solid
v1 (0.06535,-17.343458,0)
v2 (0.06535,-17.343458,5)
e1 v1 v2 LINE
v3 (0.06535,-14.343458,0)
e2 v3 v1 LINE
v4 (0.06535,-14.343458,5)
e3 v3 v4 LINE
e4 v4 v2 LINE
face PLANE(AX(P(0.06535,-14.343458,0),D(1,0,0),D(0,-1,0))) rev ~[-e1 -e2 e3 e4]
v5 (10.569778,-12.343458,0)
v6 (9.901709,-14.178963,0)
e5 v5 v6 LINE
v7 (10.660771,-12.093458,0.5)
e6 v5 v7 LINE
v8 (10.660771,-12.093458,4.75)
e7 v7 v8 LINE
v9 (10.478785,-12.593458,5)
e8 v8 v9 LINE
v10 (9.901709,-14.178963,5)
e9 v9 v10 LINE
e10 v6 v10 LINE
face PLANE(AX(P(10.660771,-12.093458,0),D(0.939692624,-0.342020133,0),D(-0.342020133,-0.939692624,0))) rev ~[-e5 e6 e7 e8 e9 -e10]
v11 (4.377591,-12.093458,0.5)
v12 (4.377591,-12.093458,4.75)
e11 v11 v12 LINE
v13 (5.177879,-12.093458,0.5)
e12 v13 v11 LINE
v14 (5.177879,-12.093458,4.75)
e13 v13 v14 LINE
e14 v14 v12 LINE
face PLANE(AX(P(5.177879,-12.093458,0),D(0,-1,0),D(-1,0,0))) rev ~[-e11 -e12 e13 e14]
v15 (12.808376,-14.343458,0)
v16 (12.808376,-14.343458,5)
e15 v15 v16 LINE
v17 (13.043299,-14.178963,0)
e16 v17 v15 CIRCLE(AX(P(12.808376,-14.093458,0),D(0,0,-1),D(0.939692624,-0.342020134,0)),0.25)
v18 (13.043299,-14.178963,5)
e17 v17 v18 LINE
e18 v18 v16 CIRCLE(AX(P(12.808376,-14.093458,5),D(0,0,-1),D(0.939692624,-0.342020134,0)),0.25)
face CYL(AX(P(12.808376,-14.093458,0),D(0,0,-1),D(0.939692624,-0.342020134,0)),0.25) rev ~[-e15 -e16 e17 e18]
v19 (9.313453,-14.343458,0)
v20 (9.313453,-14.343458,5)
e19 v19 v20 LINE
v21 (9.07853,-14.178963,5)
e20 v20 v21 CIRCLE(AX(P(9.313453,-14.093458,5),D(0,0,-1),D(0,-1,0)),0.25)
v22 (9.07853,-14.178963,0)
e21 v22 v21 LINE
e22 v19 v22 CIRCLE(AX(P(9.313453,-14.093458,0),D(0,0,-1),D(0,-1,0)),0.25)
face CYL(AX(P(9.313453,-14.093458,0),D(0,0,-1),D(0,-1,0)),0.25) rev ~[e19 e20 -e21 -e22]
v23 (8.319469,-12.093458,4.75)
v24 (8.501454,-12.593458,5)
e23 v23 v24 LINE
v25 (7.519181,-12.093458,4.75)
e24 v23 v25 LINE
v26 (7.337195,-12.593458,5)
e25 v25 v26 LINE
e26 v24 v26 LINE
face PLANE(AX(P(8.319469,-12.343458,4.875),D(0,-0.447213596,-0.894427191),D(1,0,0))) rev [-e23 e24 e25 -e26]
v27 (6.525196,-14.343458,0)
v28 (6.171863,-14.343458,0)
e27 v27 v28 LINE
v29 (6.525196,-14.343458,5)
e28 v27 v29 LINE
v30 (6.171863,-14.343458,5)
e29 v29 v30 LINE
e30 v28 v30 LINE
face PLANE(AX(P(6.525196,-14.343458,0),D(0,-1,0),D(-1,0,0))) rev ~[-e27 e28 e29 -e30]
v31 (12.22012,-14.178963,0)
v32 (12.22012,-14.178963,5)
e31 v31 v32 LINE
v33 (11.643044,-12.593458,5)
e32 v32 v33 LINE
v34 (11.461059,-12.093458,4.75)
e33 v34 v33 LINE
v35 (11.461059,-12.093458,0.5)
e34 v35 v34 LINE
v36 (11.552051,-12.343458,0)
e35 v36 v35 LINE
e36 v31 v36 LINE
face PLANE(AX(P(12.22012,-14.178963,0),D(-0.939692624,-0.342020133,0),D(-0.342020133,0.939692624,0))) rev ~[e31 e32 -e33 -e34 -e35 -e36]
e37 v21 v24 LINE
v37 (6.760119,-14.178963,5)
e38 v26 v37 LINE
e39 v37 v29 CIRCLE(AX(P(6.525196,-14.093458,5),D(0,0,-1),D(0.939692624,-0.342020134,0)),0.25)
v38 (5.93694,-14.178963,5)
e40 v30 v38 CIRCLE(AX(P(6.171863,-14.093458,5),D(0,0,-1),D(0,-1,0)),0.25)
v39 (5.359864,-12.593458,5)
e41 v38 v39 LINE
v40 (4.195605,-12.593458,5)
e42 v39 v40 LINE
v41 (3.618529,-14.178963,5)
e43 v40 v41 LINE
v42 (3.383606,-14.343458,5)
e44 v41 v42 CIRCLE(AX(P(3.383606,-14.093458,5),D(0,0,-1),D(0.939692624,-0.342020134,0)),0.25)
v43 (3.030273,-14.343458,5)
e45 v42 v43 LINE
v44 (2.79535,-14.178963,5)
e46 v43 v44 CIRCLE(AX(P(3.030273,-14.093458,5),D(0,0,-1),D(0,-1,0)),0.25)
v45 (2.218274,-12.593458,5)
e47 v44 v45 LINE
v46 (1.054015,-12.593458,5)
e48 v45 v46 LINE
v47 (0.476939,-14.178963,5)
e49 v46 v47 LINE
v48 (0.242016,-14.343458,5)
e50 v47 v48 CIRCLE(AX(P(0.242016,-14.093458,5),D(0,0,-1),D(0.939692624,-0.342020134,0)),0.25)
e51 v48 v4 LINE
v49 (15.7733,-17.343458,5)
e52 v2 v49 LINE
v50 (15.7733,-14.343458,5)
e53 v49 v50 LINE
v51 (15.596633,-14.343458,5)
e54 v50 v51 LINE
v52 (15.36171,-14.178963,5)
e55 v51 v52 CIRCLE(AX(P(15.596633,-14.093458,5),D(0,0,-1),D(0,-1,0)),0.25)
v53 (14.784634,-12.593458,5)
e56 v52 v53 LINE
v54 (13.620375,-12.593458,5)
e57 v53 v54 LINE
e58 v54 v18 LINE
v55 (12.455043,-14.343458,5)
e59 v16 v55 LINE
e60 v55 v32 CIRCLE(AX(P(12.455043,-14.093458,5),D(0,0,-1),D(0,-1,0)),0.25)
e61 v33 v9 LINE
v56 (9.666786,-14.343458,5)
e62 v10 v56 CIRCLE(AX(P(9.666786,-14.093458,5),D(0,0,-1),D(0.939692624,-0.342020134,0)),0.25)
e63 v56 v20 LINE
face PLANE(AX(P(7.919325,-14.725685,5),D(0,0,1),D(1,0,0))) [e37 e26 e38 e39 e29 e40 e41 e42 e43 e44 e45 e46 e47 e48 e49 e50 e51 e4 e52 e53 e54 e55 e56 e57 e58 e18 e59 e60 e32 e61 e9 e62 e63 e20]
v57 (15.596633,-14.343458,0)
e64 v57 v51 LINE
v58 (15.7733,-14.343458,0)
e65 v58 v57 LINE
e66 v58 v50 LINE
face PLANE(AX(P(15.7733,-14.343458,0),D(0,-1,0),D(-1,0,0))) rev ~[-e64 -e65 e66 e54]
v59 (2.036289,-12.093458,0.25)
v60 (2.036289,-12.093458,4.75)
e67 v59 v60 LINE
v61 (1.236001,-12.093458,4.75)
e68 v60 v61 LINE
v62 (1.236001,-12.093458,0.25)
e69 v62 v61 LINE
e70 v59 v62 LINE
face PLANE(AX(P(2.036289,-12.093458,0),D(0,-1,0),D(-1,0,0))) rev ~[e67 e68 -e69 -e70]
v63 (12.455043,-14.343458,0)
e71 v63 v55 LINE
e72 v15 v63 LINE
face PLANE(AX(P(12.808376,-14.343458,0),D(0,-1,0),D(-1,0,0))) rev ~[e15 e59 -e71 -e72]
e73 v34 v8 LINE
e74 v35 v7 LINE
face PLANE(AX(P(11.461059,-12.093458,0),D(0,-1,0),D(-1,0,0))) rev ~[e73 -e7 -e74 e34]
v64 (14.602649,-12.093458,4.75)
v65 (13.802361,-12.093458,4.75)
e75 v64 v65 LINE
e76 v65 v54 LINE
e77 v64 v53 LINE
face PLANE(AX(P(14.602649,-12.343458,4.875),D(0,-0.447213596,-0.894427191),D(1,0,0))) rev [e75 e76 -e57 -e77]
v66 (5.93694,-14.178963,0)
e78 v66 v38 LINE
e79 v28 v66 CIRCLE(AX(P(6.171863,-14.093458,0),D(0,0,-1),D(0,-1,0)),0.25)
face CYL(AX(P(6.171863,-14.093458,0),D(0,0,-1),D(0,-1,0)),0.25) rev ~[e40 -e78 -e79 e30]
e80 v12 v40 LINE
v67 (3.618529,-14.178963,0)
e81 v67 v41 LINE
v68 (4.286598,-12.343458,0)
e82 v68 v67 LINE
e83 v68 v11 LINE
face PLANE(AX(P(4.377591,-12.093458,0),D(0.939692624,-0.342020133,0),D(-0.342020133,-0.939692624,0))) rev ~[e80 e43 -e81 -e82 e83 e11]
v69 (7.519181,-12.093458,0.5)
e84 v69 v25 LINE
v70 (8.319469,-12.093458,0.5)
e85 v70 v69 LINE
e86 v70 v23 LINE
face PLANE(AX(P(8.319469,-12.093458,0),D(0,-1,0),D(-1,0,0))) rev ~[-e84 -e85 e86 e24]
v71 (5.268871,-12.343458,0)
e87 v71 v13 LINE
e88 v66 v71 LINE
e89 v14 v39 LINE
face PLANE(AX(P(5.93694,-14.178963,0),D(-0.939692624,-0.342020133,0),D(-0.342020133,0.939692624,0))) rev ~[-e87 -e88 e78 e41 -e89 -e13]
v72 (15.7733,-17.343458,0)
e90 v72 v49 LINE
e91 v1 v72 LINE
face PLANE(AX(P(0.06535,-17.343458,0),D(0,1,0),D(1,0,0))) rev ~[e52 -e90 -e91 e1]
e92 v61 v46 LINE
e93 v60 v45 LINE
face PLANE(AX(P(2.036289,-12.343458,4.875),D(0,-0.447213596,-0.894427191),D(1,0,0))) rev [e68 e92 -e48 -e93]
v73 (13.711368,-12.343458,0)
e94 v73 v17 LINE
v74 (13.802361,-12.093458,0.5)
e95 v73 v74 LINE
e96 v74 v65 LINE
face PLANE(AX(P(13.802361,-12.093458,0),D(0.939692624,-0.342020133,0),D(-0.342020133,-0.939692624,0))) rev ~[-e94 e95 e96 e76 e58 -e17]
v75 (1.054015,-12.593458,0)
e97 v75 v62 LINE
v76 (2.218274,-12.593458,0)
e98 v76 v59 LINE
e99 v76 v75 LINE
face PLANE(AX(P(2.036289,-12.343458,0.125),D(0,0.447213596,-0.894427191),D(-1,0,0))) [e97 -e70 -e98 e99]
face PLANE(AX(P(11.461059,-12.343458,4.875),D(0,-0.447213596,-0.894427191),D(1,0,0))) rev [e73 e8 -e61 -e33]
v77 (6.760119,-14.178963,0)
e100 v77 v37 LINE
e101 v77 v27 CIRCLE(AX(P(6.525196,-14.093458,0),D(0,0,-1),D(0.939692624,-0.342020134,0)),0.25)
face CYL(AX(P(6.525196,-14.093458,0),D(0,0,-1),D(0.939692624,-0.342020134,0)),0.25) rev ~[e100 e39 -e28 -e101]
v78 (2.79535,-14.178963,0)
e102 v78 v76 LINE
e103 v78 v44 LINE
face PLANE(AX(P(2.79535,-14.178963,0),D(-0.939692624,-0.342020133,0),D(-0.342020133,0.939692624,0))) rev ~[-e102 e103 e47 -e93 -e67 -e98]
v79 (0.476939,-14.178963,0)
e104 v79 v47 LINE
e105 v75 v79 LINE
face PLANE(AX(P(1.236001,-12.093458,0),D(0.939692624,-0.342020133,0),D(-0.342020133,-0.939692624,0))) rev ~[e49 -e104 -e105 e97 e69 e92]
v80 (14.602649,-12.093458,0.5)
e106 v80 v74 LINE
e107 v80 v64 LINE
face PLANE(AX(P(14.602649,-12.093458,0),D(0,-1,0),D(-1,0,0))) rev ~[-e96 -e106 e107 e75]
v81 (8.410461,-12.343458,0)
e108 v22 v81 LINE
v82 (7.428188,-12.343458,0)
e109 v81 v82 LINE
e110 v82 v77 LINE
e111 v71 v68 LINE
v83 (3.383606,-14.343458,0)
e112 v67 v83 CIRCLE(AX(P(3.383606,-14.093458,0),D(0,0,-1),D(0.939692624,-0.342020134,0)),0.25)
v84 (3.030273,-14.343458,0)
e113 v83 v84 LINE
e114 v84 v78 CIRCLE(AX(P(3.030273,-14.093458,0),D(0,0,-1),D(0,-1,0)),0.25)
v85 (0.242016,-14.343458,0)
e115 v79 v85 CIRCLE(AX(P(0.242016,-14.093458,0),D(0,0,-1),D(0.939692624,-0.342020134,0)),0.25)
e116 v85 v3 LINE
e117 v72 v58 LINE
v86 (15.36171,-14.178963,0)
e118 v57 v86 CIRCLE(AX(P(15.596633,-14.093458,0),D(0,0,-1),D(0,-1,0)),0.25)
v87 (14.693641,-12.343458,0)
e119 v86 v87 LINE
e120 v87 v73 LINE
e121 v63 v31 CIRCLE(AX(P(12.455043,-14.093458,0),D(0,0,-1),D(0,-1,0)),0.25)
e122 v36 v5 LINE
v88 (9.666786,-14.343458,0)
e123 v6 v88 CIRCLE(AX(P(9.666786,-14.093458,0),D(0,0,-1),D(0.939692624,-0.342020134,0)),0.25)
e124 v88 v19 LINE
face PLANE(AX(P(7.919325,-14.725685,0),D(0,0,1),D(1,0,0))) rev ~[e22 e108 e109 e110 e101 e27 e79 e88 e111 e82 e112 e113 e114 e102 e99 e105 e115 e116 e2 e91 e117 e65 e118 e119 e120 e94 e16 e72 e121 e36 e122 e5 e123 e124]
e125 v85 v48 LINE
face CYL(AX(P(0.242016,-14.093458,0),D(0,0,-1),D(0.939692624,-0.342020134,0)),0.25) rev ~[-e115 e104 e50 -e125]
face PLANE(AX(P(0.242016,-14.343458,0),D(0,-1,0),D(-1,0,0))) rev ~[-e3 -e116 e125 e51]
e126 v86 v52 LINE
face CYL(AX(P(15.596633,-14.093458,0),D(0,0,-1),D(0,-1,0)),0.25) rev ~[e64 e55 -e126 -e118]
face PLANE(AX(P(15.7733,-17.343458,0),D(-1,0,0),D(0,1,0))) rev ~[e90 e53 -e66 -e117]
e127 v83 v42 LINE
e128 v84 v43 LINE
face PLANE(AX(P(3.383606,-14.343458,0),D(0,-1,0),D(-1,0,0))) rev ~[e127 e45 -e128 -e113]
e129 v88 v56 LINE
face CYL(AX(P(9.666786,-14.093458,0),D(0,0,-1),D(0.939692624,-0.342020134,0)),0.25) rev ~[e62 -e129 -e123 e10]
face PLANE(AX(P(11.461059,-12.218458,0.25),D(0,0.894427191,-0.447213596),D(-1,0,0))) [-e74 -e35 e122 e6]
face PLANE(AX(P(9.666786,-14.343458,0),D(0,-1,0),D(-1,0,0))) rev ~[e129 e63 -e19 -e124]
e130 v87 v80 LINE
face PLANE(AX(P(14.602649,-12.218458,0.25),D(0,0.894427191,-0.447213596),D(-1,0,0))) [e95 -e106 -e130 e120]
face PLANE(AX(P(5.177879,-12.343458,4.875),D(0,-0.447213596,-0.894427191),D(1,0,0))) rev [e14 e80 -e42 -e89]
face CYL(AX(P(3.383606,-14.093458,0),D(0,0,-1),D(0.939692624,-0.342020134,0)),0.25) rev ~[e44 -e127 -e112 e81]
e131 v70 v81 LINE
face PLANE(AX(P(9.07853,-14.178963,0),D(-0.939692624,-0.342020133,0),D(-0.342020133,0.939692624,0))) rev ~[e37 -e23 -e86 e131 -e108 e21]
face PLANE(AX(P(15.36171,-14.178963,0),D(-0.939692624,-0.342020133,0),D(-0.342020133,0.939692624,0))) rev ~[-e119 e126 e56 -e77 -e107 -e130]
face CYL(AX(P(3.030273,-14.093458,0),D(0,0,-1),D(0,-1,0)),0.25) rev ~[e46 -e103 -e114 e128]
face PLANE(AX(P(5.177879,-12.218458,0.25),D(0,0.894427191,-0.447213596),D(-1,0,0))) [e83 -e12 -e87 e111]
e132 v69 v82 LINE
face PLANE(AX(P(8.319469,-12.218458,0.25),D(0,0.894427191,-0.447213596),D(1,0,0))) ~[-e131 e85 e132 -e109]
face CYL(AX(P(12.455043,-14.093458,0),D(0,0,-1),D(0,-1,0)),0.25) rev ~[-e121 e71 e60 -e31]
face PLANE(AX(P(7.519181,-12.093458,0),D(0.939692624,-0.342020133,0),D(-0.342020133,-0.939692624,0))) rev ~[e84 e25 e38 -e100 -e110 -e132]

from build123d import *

# Parameters (mm, degrees)
F1_DEPTH     = 5
F2_C1_SIZE2  = 0.25
F2_C1_SIZE   = 0.5
F2_C2_SIZE2  = 0.5
F2_C2_SIZE   = 0.25
F2_C3_SIZE2  = 0.5
F2_C3_SIZE   = 0.25
F2_C4_SIZE2  = 0.5
F2_C4_SIZE   = 0.25
F2_C5_SIZE2  = 0.25
F2_C5_SIZE   = 0.5
F2_C6_SIZE2  = 0.5
F2_C6_SIZE   = 0.25
F2_C7_SIZE2  = 0.5
F2_C7_SIZE   = 0.25
F2_C8_SIZE2  = 0.5
F2_C8_SIZE   = 0.25
F2_C9_SIZE2  = 0.5
F2_C9_SIZE   = 0.25
F2_C10_SIZE2 = 0.5
F2_C10_SIZE  = 0.25


with BuildPart() as f1:
    # F0 (on Top) → F1 (new body)
    with BuildSketch(Plane.XY):
        with BuildLine():
            Line((1.236000562, -12.0934582279), (0.4769388315, -14.1789632613))
            ThreePointArc((0.4769388315, -14.1789632613), (0.3854097856, -14.2982462382), (0.2420156754, -14.3434582279))
            Line((0.2420156754, -14.3434582279), (0.065349562, -14.3434582279))
            Line((0.065349562, -14.3434582279), (0.065349562, -17.3434582279))
            Line((0.065349562, -17.3434582279), (15.773299562, -17.3434582279))
            Line((15.773299562, -17.3434582279), (15.773299562, -14.3434582279))
            Line((15.773299562, -14.3434582279), (15.5966334485, -14.3434582279))
            ThreePointArc((15.5966334485, -14.3434582279), (15.4532393383, -14.2982462382), (15.3617102924, -14.1789632613))
            Line((15.3617102924, -14.1789632613), (14.602648562, -12.0934582279))
            Line((14.602648562, -12.0934582279), (13.802360562, -12.0934582279))
            Line((13.802360562, -12.0934582279), (13.0432988315, -14.1789632613))
            ThreePointArc((13.0432988315, -14.1789632613), (12.9517697856, -14.2982462382), (12.8083756754, -14.3434582279))
            Line((12.8083756754, -14.3434582279), (12.4550434485, -14.3434582279))
            ThreePointArc((12.4550434485, -14.3434582279), (12.3116493383, -14.2982462382), (12.2201202924, -14.1789632613))
            Line((12.2201202924, -14.1789632613), (11.461058562, -12.0934582279))
            Line((11.461058562, -12.0934582279), (10.660770562, -12.0934582279))
            Line((10.660770562, -12.0934582279), (9.9017088315, -14.1789632613))
            ThreePointArc((9.9017088315, -14.1789632613), (9.8101797856, -14.2982462382), (9.6667856754, -14.3434582279))
            Line((9.6667856754, -14.3434582279), (9.3134534485, -14.3434582279))
            ThreePointArc((9.3134534485, -14.3434582279), (9.1700593383, -14.2982462382), (9.0785302924, -14.1789632613))
            Line((9.0785302924, -14.1789632613), (8.319468562, -12.0934582279))
            Line((8.319468562, -12.0934582279), (7.519180562, -12.0934582279))
            Line((7.519180562, -12.0934582279), (6.7601188315, -14.1789632613))
            ThreePointArc((6.7601188315, -14.1789632613), (6.6685897856, -14.2982462382), (6.5251956754, -14.3434582279))
            Line((6.5251956754, -14.3434582279), (6.1718634485, -14.3434582279))
            ThreePointArc((6.1718634485, -14.3434582279), (6.0284693383, -14.2982462382), (5.9369402924, -14.1789632613))
            Line((5.9369402924, -14.1789632613), (5.177878562, -12.0934582279))
            Line((5.177878562, -12.0934582279), (4.377590562, -12.0934582279))
            Line((4.377590562, -12.0934582279), (3.6185288315, -14.1789632613))
            ThreePointArc((3.6185288315, -14.1789632613), (3.5269997856, -14.2982462382), (3.3836056754, -14.3434582279))
            Line((3.3836056754, -14.3434582279), (3.0302734485, -14.3434582279))
            ThreePointArc((3.0302734485, -14.3434582279), (2.8868793383, -14.2982462382), (2.7953502924, -14.1789632613))
            Line((2.7953502924, -14.1789632613), (2.036288562, -12.0934582279))
            Line((2.036288562, -12.0934582279), (1.236000562, -12.0934582279))
        make_face()
    extrude(amount=F1_DEPTH)

    # F2: chamfer of 0.25 x 0.5 on 10 edges, made by hand

    # F2_c1
    f2_c1_edges = [f1.edges().sort_by_distance(p)[0] for p in [
        (7.919324562, -12.0934582279, 0),
    ]]
    f2_c1_side = f1.faces().sort_by_distance((7.919324562, -12.0934582279, 0.005))[0]
    chamfer(f2_c1_edges, length=F2_C1_SIZE, length2=F2_C1_SIZE2, reference=f2_c1_side)

    # F2_c2
    f2_c2_edges = [f1.edges().sort_by_distance(p)[0] for p in [
        (7.919324562, -12.0934582279, 5),
    ]]
    f2_c2_side = f1.faces().sort_by_distance((7.919324562, -12.0934582279, 4.995))[0]
    chamfer(f2_c2_edges, length=F2_C2_SIZE, length2=F2_C2_SIZE2, reference=f2_c2_side)

    # F2_c3
    f2_c3_edges = [f1.edges().sort_by_distance(p)[0] for p in [
        (4.777734562, -12.0934582279, 0),
    ]]
    f2_c3_side = f1.faces().sort_by_distance((4.777734562, -12.0984582279, 0))[0]
    chamfer(f2_c3_edges, length=F2_C3_SIZE, length2=F2_C3_SIZE2, reference=f2_c3_side)

    # F2_c4
    f2_c4_edges = [f1.edges().sort_by_distance(p)[0] for p in [
        (4.777734562, -12.0934582279, 5),
    ]]
    f2_c4_side = f1.faces().sort_by_distance((4.777734562, -12.0934582279, 4.995))[0]
    chamfer(f2_c4_edges, length=F2_C4_SIZE, length2=F2_C4_SIZE2, reference=f2_c4_side)

    # F2_c5
    f2_c5_edges = [f1.edges().sort_by_distance(p)[0] for p in [
        (1.636144562, -12.0934582279, 0),
    ]]
    f2_c5_side = f1.faces().sort_by_distance((1.636144562, -12.0984582279, 0))[0]
    chamfer(f2_c5_edges, length=F2_C5_SIZE, length2=F2_C5_SIZE2, reference=f2_c5_side)

    # F2_c6
    f2_c6_edges = [f1.edges().sort_by_distance(p)[0] for p in [
        (1.636144562, -12.0934582279, 5),
    ]]
    f2_c6_side = f1.faces().sort_by_distance((1.636144562, -12.0934582279, 4.995))[0]
    chamfer(f2_c6_edges, length=F2_C6_SIZE, length2=F2_C6_SIZE2, reference=f2_c6_side)

    # F2_c7
    f2_c7_edges = [f1.edges().sort_by_distance(p)[0] for p in [
        (14.202504562, -12.0934582279, 0),
    ]]
    f2_c7_side = f1.faces().sort_by_distance((14.202504562, -12.0984582279, 0))[0]
    chamfer(f2_c7_edges, length=F2_C7_SIZE, length2=F2_C7_SIZE2, reference=f2_c7_side)

    # F2_c8
    f2_c8_edges = [f1.edges().sort_by_distance(p)[0] for p in [
        (14.202504562, -12.0934582279, 5),
    ]]
    f2_c8_side = f1.faces().sort_by_distance((14.202504562, -12.0934582279, 4.995))[0]
    chamfer(f2_c8_edges, length=F2_C8_SIZE, length2=F2_C8_SIZE2, reference=f2_c8_side)

    # F2_c9
    f2_c9_edges = [f1.edges().sort_by_distance(p)[0] for p in [
        (11.060914562, -12.0934582279, 0),
    ]]
    f2_c9_side = f1.faces().sort_by_distance((11.060914562, -12.0984582279, 0))[0]
    chamfer(f2_c9_edges, length=F2_C9_SIZE, length2=F2_C9_SIZE2, reference=f2_c9_side)

    # F2_c10
    f2_c10_edges = [f1.edges().sort_by_distance(p)[0] for p in [
        (11.060914562, -12.0934582279, 5),
    ]]
    f2_c10_side = f1.faces().sort_by_distance((11.060914562, -12.0934582279, 4.995))[0]
    chamfer(f2_c10_edges, length=F2_C10_SIZE, length2=F2_C10_SIZE2, reference=f2_c10_side)


solid = f1.part
